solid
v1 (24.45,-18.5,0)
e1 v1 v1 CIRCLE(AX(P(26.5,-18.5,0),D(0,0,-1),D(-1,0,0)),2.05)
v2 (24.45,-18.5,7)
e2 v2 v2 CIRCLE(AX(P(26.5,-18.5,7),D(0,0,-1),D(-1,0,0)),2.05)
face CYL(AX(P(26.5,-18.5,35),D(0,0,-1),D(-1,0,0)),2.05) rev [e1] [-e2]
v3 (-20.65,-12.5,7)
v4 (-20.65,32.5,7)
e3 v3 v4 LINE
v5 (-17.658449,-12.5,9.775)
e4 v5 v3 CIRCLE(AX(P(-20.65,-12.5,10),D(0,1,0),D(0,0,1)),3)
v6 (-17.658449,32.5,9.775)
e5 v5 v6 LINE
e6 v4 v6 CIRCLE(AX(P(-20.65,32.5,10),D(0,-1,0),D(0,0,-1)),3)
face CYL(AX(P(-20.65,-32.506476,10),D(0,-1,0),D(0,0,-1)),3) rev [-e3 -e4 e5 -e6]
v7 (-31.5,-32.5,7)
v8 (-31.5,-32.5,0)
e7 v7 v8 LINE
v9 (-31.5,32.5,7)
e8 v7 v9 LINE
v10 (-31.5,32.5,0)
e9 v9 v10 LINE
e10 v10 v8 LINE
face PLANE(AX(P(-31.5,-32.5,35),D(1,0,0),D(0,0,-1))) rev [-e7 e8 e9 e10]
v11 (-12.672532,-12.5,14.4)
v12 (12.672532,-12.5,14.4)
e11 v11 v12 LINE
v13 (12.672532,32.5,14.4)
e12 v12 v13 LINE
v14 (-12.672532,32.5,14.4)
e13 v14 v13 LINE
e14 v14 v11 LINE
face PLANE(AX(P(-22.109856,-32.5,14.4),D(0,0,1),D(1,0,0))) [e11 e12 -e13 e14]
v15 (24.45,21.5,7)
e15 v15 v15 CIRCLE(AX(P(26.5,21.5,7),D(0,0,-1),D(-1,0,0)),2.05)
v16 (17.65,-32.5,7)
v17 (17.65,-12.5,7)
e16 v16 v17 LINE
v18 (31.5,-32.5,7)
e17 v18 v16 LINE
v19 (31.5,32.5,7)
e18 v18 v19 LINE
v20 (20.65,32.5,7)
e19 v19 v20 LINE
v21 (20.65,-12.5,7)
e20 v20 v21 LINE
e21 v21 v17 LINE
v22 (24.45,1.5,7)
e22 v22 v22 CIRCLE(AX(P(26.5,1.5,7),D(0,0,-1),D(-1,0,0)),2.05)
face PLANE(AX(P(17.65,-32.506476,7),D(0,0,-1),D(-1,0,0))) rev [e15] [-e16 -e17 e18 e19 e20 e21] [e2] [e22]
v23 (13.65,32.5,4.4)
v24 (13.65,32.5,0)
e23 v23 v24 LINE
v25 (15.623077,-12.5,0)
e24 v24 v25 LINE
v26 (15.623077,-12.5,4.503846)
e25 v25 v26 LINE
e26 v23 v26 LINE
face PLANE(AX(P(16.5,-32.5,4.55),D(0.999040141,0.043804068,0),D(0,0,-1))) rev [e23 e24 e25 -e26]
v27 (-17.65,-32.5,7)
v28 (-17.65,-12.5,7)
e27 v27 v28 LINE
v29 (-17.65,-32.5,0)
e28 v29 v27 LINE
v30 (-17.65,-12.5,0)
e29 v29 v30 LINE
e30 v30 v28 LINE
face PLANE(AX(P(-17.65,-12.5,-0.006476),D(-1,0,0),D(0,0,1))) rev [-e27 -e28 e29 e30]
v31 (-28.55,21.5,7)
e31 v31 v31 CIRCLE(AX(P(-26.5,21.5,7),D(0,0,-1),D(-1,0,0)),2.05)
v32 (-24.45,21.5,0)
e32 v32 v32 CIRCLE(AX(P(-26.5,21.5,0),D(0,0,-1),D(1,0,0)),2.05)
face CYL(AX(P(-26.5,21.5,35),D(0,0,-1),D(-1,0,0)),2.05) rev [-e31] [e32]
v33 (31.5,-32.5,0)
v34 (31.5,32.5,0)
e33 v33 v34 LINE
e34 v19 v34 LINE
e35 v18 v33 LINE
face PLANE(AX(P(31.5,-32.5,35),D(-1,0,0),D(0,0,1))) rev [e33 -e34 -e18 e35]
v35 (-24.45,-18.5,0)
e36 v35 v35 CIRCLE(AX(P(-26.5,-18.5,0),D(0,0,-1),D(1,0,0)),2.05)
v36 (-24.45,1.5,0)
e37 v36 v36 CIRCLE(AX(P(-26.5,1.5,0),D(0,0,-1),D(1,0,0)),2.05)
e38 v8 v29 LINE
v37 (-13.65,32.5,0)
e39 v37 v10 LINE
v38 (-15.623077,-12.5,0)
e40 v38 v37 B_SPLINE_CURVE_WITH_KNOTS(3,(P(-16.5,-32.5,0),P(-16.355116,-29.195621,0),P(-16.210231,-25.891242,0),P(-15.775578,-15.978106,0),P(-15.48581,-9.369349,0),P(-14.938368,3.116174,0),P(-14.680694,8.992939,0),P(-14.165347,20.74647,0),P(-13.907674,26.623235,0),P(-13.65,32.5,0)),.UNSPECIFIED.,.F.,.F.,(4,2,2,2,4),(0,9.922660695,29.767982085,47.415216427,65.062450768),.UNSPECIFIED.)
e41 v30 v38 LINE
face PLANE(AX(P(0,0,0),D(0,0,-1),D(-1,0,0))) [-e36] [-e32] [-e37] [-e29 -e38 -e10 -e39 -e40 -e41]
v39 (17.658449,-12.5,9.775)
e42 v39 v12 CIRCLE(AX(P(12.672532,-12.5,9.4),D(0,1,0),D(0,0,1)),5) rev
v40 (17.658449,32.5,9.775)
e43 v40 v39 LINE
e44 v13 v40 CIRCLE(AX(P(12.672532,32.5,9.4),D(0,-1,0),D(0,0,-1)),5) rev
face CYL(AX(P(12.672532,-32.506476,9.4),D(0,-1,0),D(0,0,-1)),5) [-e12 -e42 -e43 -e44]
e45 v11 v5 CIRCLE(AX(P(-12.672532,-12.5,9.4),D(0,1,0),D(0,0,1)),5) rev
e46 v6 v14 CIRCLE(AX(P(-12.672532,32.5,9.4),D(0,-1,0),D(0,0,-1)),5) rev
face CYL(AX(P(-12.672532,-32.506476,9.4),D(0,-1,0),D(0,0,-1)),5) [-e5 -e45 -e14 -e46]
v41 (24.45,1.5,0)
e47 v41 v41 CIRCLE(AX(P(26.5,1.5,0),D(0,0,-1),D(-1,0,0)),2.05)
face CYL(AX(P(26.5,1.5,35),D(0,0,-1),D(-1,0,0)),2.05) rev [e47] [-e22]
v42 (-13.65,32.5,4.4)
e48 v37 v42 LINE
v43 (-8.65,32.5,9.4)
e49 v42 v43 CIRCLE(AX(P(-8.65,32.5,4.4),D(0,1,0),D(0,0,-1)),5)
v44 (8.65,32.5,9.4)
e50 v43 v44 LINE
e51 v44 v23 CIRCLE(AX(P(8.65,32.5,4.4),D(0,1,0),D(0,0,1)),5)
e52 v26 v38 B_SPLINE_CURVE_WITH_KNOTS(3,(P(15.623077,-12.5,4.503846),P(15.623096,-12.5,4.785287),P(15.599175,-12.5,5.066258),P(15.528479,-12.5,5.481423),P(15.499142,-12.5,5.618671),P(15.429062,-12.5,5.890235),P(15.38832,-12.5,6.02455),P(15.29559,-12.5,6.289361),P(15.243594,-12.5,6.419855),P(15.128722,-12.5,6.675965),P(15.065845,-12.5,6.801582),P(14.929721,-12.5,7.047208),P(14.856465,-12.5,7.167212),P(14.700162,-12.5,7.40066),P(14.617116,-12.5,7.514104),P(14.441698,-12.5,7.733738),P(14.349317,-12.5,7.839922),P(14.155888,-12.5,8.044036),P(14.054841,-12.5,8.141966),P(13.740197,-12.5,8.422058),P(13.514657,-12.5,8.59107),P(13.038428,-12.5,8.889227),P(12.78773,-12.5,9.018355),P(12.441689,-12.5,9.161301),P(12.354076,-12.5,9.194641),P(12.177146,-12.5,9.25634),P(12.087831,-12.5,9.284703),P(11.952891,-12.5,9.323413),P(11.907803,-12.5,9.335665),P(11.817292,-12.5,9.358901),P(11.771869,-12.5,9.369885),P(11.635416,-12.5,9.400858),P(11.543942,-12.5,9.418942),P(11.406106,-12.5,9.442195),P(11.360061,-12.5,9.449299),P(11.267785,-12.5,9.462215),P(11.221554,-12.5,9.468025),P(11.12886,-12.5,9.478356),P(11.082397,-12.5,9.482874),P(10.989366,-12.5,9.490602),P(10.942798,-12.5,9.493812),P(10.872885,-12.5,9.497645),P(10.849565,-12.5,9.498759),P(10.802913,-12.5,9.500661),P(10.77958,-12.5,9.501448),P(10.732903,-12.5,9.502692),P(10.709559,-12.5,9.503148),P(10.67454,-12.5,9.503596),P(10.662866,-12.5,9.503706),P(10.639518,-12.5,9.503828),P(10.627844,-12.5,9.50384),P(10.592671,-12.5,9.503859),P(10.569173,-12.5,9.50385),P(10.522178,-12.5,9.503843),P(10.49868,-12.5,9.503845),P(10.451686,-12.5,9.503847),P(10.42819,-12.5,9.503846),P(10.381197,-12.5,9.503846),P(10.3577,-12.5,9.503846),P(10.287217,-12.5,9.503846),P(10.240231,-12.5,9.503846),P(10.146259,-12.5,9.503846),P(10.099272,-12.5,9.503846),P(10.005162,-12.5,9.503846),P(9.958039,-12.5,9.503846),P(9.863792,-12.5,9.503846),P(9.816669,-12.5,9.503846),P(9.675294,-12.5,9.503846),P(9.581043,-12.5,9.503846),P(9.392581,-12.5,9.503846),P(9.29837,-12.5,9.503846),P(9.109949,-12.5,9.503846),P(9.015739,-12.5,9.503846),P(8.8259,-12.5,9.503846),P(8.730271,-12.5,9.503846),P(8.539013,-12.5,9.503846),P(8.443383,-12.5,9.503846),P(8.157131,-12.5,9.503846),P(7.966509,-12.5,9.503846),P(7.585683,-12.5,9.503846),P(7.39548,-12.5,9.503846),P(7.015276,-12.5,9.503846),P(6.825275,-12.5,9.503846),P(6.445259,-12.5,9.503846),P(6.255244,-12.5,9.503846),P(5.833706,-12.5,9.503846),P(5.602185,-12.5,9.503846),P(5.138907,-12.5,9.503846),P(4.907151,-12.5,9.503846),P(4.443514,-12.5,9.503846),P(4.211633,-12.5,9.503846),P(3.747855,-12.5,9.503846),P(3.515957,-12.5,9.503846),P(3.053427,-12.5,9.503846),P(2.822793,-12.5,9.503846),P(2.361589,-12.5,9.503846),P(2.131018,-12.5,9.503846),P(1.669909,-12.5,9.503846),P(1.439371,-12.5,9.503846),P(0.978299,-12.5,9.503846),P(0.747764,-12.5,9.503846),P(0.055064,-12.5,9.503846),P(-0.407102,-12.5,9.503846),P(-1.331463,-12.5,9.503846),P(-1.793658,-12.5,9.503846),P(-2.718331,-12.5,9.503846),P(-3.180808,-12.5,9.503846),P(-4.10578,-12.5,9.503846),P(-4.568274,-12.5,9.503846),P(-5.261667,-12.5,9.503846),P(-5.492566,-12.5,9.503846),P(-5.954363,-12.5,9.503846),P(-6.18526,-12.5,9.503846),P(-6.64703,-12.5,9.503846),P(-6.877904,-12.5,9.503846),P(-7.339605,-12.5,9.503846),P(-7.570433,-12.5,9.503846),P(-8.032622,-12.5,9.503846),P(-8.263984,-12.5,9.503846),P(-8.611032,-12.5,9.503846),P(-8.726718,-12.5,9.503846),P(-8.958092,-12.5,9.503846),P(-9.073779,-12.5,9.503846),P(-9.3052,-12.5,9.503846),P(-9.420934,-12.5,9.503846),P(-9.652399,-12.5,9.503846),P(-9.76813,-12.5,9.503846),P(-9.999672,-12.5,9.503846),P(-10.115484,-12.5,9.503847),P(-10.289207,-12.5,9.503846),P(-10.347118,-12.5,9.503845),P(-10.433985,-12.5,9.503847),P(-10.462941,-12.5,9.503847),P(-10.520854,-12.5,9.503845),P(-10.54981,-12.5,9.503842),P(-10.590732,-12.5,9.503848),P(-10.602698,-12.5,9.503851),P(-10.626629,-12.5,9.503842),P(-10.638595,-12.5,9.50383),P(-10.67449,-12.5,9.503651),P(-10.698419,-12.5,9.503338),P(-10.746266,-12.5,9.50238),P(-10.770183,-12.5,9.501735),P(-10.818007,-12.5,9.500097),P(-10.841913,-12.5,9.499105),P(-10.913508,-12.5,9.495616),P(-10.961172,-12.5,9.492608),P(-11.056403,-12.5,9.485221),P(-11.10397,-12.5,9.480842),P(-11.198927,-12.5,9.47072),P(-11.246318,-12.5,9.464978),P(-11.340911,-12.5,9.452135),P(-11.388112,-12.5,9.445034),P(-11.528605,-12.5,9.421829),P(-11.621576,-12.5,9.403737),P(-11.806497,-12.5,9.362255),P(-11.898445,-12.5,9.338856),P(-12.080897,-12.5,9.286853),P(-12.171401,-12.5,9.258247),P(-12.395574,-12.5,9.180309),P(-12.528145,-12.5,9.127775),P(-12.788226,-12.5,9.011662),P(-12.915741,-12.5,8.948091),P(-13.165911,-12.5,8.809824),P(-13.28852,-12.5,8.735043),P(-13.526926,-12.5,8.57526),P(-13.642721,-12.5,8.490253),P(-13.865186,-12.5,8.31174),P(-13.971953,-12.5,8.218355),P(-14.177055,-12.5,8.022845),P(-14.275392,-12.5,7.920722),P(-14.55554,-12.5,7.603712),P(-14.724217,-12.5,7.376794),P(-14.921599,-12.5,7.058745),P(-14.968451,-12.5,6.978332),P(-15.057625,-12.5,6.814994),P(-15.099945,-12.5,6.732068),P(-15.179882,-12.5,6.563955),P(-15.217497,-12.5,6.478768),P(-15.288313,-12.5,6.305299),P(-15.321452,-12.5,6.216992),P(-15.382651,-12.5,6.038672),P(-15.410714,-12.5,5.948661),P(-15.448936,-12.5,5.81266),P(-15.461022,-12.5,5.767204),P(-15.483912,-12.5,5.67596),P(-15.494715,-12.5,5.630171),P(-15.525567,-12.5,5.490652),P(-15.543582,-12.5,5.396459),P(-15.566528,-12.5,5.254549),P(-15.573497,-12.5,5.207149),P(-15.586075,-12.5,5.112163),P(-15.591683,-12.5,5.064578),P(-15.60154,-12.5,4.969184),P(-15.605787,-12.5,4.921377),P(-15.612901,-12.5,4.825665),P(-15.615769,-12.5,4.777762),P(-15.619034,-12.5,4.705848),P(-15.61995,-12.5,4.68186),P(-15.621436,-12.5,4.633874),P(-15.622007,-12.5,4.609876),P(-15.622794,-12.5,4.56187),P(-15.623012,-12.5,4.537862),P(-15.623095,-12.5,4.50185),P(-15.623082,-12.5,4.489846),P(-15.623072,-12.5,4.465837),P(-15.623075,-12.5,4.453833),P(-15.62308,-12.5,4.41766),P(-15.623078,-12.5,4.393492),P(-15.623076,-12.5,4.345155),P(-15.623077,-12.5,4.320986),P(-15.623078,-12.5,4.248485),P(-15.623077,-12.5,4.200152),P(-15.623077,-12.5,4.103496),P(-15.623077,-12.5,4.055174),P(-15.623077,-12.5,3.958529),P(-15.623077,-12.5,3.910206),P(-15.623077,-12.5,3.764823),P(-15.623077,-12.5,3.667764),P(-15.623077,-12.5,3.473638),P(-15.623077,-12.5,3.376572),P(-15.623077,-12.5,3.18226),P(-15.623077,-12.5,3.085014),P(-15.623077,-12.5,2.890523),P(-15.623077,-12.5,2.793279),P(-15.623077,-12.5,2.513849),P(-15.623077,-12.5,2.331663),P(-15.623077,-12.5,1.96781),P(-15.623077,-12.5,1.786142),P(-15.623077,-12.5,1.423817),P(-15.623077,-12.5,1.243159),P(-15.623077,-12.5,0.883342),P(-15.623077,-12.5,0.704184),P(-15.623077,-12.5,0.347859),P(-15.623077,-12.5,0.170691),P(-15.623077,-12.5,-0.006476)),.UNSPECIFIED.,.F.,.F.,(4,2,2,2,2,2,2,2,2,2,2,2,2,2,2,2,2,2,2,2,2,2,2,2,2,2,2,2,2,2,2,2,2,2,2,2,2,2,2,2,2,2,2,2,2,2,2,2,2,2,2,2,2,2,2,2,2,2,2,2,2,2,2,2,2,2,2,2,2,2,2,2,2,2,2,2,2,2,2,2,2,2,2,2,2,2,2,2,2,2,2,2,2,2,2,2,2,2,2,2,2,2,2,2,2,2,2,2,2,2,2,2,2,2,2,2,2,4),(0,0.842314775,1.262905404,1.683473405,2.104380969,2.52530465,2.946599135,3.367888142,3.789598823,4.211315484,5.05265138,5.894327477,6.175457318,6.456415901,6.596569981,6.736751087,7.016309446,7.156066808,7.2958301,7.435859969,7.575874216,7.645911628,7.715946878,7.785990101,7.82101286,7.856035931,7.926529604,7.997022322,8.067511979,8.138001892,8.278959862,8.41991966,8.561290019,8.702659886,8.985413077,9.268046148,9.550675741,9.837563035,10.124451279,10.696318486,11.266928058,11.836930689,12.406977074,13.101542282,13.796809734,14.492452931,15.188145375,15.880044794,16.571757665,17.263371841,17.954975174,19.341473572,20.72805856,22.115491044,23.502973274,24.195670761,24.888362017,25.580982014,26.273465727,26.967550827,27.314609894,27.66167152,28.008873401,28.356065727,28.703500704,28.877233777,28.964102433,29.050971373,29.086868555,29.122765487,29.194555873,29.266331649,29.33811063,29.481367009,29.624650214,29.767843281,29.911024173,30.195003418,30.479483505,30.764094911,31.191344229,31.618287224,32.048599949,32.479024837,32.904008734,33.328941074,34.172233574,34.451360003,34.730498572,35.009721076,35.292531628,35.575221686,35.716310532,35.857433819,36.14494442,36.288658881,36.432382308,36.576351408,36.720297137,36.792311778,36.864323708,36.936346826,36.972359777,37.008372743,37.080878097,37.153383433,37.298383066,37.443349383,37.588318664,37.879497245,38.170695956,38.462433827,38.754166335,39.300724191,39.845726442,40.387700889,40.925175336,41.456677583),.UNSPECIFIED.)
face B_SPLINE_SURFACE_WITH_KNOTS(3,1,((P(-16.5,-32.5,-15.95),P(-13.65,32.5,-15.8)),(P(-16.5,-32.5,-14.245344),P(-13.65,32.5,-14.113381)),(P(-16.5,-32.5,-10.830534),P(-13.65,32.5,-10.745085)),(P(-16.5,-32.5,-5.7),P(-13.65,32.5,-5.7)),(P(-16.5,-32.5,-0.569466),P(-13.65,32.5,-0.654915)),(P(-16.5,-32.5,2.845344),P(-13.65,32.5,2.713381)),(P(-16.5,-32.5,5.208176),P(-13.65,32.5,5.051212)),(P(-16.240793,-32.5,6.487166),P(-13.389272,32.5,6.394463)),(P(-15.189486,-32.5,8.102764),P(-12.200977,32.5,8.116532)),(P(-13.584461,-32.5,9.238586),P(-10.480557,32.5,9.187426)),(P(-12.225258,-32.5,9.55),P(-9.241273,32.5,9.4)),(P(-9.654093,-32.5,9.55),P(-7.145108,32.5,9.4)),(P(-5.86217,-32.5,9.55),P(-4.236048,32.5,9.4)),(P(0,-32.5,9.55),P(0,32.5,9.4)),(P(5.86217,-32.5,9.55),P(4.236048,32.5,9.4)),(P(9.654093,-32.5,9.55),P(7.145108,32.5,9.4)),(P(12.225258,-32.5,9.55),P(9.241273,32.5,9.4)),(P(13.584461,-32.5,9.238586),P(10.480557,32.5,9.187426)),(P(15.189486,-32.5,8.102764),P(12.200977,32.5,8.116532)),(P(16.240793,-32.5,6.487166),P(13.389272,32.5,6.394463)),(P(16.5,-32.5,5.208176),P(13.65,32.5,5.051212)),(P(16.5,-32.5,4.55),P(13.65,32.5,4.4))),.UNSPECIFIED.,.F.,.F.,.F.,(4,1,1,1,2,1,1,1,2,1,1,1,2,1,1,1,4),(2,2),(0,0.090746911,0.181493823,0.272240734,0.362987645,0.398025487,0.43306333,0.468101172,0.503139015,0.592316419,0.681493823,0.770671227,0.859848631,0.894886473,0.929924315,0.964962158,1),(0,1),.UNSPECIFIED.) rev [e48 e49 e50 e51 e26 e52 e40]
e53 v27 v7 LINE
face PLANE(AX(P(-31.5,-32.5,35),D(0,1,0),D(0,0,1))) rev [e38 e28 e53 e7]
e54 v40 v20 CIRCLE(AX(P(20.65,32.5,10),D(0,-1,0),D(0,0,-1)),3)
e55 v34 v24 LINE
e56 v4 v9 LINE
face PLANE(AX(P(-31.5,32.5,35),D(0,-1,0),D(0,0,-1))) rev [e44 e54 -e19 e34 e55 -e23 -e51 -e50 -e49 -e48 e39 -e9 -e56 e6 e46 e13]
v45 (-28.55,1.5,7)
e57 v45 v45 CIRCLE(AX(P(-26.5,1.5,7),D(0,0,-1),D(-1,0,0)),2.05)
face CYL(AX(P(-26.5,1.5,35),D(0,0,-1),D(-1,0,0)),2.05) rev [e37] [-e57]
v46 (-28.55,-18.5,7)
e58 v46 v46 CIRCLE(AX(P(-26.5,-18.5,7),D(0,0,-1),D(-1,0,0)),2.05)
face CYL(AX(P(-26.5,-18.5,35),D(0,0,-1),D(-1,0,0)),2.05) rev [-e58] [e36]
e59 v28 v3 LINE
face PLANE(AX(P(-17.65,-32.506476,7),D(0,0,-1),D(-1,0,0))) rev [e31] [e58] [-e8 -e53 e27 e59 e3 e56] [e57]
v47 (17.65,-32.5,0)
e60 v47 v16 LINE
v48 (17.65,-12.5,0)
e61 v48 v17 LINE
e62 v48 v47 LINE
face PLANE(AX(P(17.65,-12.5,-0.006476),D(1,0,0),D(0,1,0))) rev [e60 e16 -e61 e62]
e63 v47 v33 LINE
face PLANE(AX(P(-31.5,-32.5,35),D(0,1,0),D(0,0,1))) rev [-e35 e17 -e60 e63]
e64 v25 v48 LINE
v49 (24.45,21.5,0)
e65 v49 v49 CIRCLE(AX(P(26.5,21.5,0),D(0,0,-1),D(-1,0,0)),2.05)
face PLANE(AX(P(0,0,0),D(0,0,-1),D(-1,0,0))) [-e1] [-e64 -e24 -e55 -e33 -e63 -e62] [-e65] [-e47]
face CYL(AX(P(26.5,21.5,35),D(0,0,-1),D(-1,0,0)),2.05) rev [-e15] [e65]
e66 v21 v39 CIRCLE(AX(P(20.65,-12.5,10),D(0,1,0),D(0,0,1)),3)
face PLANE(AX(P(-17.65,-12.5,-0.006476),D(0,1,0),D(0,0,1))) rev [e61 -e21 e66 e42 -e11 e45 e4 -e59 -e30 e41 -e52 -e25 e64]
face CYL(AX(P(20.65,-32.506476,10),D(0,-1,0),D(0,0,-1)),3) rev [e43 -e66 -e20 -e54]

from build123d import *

# Parameters (mm, degrees)
SKETCH1_W           = 63
SKETCH1_H           = 65
BOSS_EXTRUDE1_DEPTH = 35
SKETCH4_W           = 13.85
SKETCH4_H           = 28
CUT_EXTRUDE1_DEPTH  = 81.26362829
SKETCH6_R           = 2.05
CUT_EXTRUDE2_DEPTH  = 35
SKETCH7_W           = 35.3
SKETCH7_H           = 20
CUT_EXTRUDE3_DEPTH  = 58.214508823
SKETCH5_W           = 43.787246082
SKETCH5_H           = 26.488580963
CUT_EXTRUDE4_DEPTH  = 81.26362829
FILLET1_R           = 3
FILLET2_R           = 5


with BuildPart() as part:
    # Sketch1 → Boss-Extrude1 (new body)
    with BuildSketch(Plane.XY):
        Rectangle(SKETCH1_W, SKETCH1_H)
    extrude(amount=BOSS_EXTRUDE1_DEPTH)

    # Cut-Loft1: read off the stored shape, not the designer's step
    # Cut-Loft1: loft between two sections, ruled curve by curve
    cut_loft1_from = [
        Edge.make_bspline([(-16.5, -32.5, -15.95), (-16.5, -32.5, -14.245344374), (-16.5, -32.5, -10.830534175), (-16.5, -32.5, -5.7), (-16.5, -32.5, -0.569465825), (-16.5, -32.5, 2.845344374), (-16.5, -32.5, 5.208176172), (-16.24079277, -32.5, 6.487165764), (-15.189486136, -32.5, 8.102764154), (-13.584460954, -32.5, 9.238586175), (-12.225257815, -32.5, 9.55), (-9.654092683, -32.5, 9.55), (-5.862169747, -32.5, 9.55), (0, -32.5, 9.55), (5.862169747, -32.5, 9.55), (9.654092683, -32.5, 9.55), (12.225257815, -32.5, 9.55), (13.584460954, -32.5, 9.238586175), (15.189486136, -32.5, 8.102764154), (16.24079277, -32.5, 6.487165764), (16.5, -32.5, 5.208176172), (16.5, -32.5, 4.55)], [0, 0, 0, 0, 0.090746911, 0.181493823, 0.272240734, 0.362987645, 0.362987645, 0.398025487, 0.43306333, 0.468101172, 0.503139015, 0.503139015, 0.592316419, 0.681493823, 0.770671227, 0.859848631, 0.859848631, 0.894886473, 0.929924315, 0.964962158, 1, 1, 1, 1], 3),
        Edge.make_line((16.5, -32.5, 0), (16.5, -32.5, 4.55)),
        Edge.make_line((16.5, -32.5, 0), (-16.5, -32.5, -15.95)),
    ]
    cut_loft1_to = [
        Edge.make_bspline([(-13.65, 32.5, -15.8), (-13.65, 32.5, -14.113380525), (-13.65, 32.5, -10.745084998), (-13.65, 32.5, -5.7), (-13.65, 32.5, -0.654915002), (-13.65, 32.5, 2.713380525), (-13.65, 32.5, 5.051212323), (-13.38927185, 32.5, 6.394463384), (-12.20097724, 32.5, 8.116532102), (-10.480556624, 32.5, 9.187425671), (-9.241272853, 32.5, 9.4), (-7.145107721, 32.5, 9.4), (-4.236047985, 32.5, 9.4), (0, 32.5, 9.4), (4.236047985, 32.5, 9.4), (7.145107721, 32.5, 9.4), (9.241272853, 32.5, 9.4), (10.480556624, 32.5, 9.187425671), (12.20097724, 32.5, 8.116532102), (13.38927185, 32.5, 6.394463384), (13.65, 32.5, 5.051212323), (13.65, 32.5, 4.4)], [0, 0, 0, 0, 0.090746911, 0.181493823, 0.272240734, 0.362987645, 0.362987645, 0.398025487, 0.43306333, 0.468101172, 0.503139015, 0.503139015, 0.592316419, 0.681493823, 0.770671227, 0.859848631, 0.859848631, 0.894886473, 0.929924315, 0.964962158, 1, 1, 1, 1], 3),
        Edge.make_line((13.65, 32.5, 0), (13.65, 32.5, 4.4)),
        Edge.make_line((13.65, 32.5, 0), (-13.65, 32.5, -15.8)),
    ]
    cut_loft1 = Solid(Shell([*[Face.make_surface_from_curves(cut_loft1_from[k], cut_loft1_to[k]) for k in range(3)], Face(Wire(cut_loft1_from)), Face(Wire(cut_loft1_to))]))
    add(cut_loft1, mode=Mode.SUBTRACT)

    # Sketch4 → Cut-Extrude1 (cut, through all)
    with BuildSketch(Plane(origin=(0, 32.5, 0), x_dir=(1, 0, 0), z_dir=(0, 1, 0))):
        with Locations((24.575, -21)):
            Rectangle(SKETCH4_W, SKETCH4_H)
        with Locations((-24.575, -21)):
            Rectangle(SKETCH4_W, SKETCH4_H)
    extrude(amount=-CUT_EXTRUDE1_DEPTH, mode=Mode.SUBTRACT)

    # Sketch6 → Cut-Extrude2 (cut)
    with BuildSketch(Plane(origin=(0, 0, 0), x_dir=(-1, 0, 0), z_dir=(0, 0, -1))):
        with Locations((-26.5, -18.5)):
            Circle(SKETCH6_R)
        with Locations((-26.5, 1.5)):
            Circle(SKETCH6_R)
        with Locations((-26.5, 21.5)):
            Circle(SKETCH6_R)
        with Locations((26.5, -18.5)):
            Circle(SKETCH6_R)
        with Locations((26.5, 1.5)):
            Circle(SKETCH6_R)
        with Locations((26.5, 21.5)):
            Circle(SKETCH6_R)
    extrude(amount=-CUT_EXTRUDE2_DEPTH, mode=Mode.SUBTRACT)

    # Sketch7 → Cut-Extrude3 (cut, through all)
    with BuildSketch(Plane.XY.offset(35)):
        with Locations((0, -22.5)):
            Rectangle(SKETCH7_W, SKETCH7_H)
    extrude(amount=-CUT_EXTRUDE3_DEPTH, mode=Mode.SUBTRACT)

    # Sketch5 → Cut-Extrude4 (cut, through all)
    with BuildSketch(Plane(origin=(0, 32.5, 0), x_dir=(1, 0, 0), z_dir=(0, 1, 0))):
        with Locations((-0.216233314, -27.644290482)):
            Rectangle(SKETCH5_W, SKETCH5_H)
    extrude(amount=-CUT_EXTRUDE4_DEPTH, mode=Mode.SUBTRACT)

    # Fillet1
    fillet1_edges = [part.edges().sort_by_distance(p)[0] for p in [
        (17.65, 10, 7),
        (-17.65, 10, 7),
    ]]
    fillet(fillet1_edges, radius=FILLET1_R)

    # Fillet2
    fillet2_edges = [part.edges().sort_by_distance(p)[0] for p in [
        (-17.65, 10, 14.4),
        (17.65, 10, 14.4),
    ]]
    fillet(fillet2_edges, radius=FILLET2_R)


solid = part.part
